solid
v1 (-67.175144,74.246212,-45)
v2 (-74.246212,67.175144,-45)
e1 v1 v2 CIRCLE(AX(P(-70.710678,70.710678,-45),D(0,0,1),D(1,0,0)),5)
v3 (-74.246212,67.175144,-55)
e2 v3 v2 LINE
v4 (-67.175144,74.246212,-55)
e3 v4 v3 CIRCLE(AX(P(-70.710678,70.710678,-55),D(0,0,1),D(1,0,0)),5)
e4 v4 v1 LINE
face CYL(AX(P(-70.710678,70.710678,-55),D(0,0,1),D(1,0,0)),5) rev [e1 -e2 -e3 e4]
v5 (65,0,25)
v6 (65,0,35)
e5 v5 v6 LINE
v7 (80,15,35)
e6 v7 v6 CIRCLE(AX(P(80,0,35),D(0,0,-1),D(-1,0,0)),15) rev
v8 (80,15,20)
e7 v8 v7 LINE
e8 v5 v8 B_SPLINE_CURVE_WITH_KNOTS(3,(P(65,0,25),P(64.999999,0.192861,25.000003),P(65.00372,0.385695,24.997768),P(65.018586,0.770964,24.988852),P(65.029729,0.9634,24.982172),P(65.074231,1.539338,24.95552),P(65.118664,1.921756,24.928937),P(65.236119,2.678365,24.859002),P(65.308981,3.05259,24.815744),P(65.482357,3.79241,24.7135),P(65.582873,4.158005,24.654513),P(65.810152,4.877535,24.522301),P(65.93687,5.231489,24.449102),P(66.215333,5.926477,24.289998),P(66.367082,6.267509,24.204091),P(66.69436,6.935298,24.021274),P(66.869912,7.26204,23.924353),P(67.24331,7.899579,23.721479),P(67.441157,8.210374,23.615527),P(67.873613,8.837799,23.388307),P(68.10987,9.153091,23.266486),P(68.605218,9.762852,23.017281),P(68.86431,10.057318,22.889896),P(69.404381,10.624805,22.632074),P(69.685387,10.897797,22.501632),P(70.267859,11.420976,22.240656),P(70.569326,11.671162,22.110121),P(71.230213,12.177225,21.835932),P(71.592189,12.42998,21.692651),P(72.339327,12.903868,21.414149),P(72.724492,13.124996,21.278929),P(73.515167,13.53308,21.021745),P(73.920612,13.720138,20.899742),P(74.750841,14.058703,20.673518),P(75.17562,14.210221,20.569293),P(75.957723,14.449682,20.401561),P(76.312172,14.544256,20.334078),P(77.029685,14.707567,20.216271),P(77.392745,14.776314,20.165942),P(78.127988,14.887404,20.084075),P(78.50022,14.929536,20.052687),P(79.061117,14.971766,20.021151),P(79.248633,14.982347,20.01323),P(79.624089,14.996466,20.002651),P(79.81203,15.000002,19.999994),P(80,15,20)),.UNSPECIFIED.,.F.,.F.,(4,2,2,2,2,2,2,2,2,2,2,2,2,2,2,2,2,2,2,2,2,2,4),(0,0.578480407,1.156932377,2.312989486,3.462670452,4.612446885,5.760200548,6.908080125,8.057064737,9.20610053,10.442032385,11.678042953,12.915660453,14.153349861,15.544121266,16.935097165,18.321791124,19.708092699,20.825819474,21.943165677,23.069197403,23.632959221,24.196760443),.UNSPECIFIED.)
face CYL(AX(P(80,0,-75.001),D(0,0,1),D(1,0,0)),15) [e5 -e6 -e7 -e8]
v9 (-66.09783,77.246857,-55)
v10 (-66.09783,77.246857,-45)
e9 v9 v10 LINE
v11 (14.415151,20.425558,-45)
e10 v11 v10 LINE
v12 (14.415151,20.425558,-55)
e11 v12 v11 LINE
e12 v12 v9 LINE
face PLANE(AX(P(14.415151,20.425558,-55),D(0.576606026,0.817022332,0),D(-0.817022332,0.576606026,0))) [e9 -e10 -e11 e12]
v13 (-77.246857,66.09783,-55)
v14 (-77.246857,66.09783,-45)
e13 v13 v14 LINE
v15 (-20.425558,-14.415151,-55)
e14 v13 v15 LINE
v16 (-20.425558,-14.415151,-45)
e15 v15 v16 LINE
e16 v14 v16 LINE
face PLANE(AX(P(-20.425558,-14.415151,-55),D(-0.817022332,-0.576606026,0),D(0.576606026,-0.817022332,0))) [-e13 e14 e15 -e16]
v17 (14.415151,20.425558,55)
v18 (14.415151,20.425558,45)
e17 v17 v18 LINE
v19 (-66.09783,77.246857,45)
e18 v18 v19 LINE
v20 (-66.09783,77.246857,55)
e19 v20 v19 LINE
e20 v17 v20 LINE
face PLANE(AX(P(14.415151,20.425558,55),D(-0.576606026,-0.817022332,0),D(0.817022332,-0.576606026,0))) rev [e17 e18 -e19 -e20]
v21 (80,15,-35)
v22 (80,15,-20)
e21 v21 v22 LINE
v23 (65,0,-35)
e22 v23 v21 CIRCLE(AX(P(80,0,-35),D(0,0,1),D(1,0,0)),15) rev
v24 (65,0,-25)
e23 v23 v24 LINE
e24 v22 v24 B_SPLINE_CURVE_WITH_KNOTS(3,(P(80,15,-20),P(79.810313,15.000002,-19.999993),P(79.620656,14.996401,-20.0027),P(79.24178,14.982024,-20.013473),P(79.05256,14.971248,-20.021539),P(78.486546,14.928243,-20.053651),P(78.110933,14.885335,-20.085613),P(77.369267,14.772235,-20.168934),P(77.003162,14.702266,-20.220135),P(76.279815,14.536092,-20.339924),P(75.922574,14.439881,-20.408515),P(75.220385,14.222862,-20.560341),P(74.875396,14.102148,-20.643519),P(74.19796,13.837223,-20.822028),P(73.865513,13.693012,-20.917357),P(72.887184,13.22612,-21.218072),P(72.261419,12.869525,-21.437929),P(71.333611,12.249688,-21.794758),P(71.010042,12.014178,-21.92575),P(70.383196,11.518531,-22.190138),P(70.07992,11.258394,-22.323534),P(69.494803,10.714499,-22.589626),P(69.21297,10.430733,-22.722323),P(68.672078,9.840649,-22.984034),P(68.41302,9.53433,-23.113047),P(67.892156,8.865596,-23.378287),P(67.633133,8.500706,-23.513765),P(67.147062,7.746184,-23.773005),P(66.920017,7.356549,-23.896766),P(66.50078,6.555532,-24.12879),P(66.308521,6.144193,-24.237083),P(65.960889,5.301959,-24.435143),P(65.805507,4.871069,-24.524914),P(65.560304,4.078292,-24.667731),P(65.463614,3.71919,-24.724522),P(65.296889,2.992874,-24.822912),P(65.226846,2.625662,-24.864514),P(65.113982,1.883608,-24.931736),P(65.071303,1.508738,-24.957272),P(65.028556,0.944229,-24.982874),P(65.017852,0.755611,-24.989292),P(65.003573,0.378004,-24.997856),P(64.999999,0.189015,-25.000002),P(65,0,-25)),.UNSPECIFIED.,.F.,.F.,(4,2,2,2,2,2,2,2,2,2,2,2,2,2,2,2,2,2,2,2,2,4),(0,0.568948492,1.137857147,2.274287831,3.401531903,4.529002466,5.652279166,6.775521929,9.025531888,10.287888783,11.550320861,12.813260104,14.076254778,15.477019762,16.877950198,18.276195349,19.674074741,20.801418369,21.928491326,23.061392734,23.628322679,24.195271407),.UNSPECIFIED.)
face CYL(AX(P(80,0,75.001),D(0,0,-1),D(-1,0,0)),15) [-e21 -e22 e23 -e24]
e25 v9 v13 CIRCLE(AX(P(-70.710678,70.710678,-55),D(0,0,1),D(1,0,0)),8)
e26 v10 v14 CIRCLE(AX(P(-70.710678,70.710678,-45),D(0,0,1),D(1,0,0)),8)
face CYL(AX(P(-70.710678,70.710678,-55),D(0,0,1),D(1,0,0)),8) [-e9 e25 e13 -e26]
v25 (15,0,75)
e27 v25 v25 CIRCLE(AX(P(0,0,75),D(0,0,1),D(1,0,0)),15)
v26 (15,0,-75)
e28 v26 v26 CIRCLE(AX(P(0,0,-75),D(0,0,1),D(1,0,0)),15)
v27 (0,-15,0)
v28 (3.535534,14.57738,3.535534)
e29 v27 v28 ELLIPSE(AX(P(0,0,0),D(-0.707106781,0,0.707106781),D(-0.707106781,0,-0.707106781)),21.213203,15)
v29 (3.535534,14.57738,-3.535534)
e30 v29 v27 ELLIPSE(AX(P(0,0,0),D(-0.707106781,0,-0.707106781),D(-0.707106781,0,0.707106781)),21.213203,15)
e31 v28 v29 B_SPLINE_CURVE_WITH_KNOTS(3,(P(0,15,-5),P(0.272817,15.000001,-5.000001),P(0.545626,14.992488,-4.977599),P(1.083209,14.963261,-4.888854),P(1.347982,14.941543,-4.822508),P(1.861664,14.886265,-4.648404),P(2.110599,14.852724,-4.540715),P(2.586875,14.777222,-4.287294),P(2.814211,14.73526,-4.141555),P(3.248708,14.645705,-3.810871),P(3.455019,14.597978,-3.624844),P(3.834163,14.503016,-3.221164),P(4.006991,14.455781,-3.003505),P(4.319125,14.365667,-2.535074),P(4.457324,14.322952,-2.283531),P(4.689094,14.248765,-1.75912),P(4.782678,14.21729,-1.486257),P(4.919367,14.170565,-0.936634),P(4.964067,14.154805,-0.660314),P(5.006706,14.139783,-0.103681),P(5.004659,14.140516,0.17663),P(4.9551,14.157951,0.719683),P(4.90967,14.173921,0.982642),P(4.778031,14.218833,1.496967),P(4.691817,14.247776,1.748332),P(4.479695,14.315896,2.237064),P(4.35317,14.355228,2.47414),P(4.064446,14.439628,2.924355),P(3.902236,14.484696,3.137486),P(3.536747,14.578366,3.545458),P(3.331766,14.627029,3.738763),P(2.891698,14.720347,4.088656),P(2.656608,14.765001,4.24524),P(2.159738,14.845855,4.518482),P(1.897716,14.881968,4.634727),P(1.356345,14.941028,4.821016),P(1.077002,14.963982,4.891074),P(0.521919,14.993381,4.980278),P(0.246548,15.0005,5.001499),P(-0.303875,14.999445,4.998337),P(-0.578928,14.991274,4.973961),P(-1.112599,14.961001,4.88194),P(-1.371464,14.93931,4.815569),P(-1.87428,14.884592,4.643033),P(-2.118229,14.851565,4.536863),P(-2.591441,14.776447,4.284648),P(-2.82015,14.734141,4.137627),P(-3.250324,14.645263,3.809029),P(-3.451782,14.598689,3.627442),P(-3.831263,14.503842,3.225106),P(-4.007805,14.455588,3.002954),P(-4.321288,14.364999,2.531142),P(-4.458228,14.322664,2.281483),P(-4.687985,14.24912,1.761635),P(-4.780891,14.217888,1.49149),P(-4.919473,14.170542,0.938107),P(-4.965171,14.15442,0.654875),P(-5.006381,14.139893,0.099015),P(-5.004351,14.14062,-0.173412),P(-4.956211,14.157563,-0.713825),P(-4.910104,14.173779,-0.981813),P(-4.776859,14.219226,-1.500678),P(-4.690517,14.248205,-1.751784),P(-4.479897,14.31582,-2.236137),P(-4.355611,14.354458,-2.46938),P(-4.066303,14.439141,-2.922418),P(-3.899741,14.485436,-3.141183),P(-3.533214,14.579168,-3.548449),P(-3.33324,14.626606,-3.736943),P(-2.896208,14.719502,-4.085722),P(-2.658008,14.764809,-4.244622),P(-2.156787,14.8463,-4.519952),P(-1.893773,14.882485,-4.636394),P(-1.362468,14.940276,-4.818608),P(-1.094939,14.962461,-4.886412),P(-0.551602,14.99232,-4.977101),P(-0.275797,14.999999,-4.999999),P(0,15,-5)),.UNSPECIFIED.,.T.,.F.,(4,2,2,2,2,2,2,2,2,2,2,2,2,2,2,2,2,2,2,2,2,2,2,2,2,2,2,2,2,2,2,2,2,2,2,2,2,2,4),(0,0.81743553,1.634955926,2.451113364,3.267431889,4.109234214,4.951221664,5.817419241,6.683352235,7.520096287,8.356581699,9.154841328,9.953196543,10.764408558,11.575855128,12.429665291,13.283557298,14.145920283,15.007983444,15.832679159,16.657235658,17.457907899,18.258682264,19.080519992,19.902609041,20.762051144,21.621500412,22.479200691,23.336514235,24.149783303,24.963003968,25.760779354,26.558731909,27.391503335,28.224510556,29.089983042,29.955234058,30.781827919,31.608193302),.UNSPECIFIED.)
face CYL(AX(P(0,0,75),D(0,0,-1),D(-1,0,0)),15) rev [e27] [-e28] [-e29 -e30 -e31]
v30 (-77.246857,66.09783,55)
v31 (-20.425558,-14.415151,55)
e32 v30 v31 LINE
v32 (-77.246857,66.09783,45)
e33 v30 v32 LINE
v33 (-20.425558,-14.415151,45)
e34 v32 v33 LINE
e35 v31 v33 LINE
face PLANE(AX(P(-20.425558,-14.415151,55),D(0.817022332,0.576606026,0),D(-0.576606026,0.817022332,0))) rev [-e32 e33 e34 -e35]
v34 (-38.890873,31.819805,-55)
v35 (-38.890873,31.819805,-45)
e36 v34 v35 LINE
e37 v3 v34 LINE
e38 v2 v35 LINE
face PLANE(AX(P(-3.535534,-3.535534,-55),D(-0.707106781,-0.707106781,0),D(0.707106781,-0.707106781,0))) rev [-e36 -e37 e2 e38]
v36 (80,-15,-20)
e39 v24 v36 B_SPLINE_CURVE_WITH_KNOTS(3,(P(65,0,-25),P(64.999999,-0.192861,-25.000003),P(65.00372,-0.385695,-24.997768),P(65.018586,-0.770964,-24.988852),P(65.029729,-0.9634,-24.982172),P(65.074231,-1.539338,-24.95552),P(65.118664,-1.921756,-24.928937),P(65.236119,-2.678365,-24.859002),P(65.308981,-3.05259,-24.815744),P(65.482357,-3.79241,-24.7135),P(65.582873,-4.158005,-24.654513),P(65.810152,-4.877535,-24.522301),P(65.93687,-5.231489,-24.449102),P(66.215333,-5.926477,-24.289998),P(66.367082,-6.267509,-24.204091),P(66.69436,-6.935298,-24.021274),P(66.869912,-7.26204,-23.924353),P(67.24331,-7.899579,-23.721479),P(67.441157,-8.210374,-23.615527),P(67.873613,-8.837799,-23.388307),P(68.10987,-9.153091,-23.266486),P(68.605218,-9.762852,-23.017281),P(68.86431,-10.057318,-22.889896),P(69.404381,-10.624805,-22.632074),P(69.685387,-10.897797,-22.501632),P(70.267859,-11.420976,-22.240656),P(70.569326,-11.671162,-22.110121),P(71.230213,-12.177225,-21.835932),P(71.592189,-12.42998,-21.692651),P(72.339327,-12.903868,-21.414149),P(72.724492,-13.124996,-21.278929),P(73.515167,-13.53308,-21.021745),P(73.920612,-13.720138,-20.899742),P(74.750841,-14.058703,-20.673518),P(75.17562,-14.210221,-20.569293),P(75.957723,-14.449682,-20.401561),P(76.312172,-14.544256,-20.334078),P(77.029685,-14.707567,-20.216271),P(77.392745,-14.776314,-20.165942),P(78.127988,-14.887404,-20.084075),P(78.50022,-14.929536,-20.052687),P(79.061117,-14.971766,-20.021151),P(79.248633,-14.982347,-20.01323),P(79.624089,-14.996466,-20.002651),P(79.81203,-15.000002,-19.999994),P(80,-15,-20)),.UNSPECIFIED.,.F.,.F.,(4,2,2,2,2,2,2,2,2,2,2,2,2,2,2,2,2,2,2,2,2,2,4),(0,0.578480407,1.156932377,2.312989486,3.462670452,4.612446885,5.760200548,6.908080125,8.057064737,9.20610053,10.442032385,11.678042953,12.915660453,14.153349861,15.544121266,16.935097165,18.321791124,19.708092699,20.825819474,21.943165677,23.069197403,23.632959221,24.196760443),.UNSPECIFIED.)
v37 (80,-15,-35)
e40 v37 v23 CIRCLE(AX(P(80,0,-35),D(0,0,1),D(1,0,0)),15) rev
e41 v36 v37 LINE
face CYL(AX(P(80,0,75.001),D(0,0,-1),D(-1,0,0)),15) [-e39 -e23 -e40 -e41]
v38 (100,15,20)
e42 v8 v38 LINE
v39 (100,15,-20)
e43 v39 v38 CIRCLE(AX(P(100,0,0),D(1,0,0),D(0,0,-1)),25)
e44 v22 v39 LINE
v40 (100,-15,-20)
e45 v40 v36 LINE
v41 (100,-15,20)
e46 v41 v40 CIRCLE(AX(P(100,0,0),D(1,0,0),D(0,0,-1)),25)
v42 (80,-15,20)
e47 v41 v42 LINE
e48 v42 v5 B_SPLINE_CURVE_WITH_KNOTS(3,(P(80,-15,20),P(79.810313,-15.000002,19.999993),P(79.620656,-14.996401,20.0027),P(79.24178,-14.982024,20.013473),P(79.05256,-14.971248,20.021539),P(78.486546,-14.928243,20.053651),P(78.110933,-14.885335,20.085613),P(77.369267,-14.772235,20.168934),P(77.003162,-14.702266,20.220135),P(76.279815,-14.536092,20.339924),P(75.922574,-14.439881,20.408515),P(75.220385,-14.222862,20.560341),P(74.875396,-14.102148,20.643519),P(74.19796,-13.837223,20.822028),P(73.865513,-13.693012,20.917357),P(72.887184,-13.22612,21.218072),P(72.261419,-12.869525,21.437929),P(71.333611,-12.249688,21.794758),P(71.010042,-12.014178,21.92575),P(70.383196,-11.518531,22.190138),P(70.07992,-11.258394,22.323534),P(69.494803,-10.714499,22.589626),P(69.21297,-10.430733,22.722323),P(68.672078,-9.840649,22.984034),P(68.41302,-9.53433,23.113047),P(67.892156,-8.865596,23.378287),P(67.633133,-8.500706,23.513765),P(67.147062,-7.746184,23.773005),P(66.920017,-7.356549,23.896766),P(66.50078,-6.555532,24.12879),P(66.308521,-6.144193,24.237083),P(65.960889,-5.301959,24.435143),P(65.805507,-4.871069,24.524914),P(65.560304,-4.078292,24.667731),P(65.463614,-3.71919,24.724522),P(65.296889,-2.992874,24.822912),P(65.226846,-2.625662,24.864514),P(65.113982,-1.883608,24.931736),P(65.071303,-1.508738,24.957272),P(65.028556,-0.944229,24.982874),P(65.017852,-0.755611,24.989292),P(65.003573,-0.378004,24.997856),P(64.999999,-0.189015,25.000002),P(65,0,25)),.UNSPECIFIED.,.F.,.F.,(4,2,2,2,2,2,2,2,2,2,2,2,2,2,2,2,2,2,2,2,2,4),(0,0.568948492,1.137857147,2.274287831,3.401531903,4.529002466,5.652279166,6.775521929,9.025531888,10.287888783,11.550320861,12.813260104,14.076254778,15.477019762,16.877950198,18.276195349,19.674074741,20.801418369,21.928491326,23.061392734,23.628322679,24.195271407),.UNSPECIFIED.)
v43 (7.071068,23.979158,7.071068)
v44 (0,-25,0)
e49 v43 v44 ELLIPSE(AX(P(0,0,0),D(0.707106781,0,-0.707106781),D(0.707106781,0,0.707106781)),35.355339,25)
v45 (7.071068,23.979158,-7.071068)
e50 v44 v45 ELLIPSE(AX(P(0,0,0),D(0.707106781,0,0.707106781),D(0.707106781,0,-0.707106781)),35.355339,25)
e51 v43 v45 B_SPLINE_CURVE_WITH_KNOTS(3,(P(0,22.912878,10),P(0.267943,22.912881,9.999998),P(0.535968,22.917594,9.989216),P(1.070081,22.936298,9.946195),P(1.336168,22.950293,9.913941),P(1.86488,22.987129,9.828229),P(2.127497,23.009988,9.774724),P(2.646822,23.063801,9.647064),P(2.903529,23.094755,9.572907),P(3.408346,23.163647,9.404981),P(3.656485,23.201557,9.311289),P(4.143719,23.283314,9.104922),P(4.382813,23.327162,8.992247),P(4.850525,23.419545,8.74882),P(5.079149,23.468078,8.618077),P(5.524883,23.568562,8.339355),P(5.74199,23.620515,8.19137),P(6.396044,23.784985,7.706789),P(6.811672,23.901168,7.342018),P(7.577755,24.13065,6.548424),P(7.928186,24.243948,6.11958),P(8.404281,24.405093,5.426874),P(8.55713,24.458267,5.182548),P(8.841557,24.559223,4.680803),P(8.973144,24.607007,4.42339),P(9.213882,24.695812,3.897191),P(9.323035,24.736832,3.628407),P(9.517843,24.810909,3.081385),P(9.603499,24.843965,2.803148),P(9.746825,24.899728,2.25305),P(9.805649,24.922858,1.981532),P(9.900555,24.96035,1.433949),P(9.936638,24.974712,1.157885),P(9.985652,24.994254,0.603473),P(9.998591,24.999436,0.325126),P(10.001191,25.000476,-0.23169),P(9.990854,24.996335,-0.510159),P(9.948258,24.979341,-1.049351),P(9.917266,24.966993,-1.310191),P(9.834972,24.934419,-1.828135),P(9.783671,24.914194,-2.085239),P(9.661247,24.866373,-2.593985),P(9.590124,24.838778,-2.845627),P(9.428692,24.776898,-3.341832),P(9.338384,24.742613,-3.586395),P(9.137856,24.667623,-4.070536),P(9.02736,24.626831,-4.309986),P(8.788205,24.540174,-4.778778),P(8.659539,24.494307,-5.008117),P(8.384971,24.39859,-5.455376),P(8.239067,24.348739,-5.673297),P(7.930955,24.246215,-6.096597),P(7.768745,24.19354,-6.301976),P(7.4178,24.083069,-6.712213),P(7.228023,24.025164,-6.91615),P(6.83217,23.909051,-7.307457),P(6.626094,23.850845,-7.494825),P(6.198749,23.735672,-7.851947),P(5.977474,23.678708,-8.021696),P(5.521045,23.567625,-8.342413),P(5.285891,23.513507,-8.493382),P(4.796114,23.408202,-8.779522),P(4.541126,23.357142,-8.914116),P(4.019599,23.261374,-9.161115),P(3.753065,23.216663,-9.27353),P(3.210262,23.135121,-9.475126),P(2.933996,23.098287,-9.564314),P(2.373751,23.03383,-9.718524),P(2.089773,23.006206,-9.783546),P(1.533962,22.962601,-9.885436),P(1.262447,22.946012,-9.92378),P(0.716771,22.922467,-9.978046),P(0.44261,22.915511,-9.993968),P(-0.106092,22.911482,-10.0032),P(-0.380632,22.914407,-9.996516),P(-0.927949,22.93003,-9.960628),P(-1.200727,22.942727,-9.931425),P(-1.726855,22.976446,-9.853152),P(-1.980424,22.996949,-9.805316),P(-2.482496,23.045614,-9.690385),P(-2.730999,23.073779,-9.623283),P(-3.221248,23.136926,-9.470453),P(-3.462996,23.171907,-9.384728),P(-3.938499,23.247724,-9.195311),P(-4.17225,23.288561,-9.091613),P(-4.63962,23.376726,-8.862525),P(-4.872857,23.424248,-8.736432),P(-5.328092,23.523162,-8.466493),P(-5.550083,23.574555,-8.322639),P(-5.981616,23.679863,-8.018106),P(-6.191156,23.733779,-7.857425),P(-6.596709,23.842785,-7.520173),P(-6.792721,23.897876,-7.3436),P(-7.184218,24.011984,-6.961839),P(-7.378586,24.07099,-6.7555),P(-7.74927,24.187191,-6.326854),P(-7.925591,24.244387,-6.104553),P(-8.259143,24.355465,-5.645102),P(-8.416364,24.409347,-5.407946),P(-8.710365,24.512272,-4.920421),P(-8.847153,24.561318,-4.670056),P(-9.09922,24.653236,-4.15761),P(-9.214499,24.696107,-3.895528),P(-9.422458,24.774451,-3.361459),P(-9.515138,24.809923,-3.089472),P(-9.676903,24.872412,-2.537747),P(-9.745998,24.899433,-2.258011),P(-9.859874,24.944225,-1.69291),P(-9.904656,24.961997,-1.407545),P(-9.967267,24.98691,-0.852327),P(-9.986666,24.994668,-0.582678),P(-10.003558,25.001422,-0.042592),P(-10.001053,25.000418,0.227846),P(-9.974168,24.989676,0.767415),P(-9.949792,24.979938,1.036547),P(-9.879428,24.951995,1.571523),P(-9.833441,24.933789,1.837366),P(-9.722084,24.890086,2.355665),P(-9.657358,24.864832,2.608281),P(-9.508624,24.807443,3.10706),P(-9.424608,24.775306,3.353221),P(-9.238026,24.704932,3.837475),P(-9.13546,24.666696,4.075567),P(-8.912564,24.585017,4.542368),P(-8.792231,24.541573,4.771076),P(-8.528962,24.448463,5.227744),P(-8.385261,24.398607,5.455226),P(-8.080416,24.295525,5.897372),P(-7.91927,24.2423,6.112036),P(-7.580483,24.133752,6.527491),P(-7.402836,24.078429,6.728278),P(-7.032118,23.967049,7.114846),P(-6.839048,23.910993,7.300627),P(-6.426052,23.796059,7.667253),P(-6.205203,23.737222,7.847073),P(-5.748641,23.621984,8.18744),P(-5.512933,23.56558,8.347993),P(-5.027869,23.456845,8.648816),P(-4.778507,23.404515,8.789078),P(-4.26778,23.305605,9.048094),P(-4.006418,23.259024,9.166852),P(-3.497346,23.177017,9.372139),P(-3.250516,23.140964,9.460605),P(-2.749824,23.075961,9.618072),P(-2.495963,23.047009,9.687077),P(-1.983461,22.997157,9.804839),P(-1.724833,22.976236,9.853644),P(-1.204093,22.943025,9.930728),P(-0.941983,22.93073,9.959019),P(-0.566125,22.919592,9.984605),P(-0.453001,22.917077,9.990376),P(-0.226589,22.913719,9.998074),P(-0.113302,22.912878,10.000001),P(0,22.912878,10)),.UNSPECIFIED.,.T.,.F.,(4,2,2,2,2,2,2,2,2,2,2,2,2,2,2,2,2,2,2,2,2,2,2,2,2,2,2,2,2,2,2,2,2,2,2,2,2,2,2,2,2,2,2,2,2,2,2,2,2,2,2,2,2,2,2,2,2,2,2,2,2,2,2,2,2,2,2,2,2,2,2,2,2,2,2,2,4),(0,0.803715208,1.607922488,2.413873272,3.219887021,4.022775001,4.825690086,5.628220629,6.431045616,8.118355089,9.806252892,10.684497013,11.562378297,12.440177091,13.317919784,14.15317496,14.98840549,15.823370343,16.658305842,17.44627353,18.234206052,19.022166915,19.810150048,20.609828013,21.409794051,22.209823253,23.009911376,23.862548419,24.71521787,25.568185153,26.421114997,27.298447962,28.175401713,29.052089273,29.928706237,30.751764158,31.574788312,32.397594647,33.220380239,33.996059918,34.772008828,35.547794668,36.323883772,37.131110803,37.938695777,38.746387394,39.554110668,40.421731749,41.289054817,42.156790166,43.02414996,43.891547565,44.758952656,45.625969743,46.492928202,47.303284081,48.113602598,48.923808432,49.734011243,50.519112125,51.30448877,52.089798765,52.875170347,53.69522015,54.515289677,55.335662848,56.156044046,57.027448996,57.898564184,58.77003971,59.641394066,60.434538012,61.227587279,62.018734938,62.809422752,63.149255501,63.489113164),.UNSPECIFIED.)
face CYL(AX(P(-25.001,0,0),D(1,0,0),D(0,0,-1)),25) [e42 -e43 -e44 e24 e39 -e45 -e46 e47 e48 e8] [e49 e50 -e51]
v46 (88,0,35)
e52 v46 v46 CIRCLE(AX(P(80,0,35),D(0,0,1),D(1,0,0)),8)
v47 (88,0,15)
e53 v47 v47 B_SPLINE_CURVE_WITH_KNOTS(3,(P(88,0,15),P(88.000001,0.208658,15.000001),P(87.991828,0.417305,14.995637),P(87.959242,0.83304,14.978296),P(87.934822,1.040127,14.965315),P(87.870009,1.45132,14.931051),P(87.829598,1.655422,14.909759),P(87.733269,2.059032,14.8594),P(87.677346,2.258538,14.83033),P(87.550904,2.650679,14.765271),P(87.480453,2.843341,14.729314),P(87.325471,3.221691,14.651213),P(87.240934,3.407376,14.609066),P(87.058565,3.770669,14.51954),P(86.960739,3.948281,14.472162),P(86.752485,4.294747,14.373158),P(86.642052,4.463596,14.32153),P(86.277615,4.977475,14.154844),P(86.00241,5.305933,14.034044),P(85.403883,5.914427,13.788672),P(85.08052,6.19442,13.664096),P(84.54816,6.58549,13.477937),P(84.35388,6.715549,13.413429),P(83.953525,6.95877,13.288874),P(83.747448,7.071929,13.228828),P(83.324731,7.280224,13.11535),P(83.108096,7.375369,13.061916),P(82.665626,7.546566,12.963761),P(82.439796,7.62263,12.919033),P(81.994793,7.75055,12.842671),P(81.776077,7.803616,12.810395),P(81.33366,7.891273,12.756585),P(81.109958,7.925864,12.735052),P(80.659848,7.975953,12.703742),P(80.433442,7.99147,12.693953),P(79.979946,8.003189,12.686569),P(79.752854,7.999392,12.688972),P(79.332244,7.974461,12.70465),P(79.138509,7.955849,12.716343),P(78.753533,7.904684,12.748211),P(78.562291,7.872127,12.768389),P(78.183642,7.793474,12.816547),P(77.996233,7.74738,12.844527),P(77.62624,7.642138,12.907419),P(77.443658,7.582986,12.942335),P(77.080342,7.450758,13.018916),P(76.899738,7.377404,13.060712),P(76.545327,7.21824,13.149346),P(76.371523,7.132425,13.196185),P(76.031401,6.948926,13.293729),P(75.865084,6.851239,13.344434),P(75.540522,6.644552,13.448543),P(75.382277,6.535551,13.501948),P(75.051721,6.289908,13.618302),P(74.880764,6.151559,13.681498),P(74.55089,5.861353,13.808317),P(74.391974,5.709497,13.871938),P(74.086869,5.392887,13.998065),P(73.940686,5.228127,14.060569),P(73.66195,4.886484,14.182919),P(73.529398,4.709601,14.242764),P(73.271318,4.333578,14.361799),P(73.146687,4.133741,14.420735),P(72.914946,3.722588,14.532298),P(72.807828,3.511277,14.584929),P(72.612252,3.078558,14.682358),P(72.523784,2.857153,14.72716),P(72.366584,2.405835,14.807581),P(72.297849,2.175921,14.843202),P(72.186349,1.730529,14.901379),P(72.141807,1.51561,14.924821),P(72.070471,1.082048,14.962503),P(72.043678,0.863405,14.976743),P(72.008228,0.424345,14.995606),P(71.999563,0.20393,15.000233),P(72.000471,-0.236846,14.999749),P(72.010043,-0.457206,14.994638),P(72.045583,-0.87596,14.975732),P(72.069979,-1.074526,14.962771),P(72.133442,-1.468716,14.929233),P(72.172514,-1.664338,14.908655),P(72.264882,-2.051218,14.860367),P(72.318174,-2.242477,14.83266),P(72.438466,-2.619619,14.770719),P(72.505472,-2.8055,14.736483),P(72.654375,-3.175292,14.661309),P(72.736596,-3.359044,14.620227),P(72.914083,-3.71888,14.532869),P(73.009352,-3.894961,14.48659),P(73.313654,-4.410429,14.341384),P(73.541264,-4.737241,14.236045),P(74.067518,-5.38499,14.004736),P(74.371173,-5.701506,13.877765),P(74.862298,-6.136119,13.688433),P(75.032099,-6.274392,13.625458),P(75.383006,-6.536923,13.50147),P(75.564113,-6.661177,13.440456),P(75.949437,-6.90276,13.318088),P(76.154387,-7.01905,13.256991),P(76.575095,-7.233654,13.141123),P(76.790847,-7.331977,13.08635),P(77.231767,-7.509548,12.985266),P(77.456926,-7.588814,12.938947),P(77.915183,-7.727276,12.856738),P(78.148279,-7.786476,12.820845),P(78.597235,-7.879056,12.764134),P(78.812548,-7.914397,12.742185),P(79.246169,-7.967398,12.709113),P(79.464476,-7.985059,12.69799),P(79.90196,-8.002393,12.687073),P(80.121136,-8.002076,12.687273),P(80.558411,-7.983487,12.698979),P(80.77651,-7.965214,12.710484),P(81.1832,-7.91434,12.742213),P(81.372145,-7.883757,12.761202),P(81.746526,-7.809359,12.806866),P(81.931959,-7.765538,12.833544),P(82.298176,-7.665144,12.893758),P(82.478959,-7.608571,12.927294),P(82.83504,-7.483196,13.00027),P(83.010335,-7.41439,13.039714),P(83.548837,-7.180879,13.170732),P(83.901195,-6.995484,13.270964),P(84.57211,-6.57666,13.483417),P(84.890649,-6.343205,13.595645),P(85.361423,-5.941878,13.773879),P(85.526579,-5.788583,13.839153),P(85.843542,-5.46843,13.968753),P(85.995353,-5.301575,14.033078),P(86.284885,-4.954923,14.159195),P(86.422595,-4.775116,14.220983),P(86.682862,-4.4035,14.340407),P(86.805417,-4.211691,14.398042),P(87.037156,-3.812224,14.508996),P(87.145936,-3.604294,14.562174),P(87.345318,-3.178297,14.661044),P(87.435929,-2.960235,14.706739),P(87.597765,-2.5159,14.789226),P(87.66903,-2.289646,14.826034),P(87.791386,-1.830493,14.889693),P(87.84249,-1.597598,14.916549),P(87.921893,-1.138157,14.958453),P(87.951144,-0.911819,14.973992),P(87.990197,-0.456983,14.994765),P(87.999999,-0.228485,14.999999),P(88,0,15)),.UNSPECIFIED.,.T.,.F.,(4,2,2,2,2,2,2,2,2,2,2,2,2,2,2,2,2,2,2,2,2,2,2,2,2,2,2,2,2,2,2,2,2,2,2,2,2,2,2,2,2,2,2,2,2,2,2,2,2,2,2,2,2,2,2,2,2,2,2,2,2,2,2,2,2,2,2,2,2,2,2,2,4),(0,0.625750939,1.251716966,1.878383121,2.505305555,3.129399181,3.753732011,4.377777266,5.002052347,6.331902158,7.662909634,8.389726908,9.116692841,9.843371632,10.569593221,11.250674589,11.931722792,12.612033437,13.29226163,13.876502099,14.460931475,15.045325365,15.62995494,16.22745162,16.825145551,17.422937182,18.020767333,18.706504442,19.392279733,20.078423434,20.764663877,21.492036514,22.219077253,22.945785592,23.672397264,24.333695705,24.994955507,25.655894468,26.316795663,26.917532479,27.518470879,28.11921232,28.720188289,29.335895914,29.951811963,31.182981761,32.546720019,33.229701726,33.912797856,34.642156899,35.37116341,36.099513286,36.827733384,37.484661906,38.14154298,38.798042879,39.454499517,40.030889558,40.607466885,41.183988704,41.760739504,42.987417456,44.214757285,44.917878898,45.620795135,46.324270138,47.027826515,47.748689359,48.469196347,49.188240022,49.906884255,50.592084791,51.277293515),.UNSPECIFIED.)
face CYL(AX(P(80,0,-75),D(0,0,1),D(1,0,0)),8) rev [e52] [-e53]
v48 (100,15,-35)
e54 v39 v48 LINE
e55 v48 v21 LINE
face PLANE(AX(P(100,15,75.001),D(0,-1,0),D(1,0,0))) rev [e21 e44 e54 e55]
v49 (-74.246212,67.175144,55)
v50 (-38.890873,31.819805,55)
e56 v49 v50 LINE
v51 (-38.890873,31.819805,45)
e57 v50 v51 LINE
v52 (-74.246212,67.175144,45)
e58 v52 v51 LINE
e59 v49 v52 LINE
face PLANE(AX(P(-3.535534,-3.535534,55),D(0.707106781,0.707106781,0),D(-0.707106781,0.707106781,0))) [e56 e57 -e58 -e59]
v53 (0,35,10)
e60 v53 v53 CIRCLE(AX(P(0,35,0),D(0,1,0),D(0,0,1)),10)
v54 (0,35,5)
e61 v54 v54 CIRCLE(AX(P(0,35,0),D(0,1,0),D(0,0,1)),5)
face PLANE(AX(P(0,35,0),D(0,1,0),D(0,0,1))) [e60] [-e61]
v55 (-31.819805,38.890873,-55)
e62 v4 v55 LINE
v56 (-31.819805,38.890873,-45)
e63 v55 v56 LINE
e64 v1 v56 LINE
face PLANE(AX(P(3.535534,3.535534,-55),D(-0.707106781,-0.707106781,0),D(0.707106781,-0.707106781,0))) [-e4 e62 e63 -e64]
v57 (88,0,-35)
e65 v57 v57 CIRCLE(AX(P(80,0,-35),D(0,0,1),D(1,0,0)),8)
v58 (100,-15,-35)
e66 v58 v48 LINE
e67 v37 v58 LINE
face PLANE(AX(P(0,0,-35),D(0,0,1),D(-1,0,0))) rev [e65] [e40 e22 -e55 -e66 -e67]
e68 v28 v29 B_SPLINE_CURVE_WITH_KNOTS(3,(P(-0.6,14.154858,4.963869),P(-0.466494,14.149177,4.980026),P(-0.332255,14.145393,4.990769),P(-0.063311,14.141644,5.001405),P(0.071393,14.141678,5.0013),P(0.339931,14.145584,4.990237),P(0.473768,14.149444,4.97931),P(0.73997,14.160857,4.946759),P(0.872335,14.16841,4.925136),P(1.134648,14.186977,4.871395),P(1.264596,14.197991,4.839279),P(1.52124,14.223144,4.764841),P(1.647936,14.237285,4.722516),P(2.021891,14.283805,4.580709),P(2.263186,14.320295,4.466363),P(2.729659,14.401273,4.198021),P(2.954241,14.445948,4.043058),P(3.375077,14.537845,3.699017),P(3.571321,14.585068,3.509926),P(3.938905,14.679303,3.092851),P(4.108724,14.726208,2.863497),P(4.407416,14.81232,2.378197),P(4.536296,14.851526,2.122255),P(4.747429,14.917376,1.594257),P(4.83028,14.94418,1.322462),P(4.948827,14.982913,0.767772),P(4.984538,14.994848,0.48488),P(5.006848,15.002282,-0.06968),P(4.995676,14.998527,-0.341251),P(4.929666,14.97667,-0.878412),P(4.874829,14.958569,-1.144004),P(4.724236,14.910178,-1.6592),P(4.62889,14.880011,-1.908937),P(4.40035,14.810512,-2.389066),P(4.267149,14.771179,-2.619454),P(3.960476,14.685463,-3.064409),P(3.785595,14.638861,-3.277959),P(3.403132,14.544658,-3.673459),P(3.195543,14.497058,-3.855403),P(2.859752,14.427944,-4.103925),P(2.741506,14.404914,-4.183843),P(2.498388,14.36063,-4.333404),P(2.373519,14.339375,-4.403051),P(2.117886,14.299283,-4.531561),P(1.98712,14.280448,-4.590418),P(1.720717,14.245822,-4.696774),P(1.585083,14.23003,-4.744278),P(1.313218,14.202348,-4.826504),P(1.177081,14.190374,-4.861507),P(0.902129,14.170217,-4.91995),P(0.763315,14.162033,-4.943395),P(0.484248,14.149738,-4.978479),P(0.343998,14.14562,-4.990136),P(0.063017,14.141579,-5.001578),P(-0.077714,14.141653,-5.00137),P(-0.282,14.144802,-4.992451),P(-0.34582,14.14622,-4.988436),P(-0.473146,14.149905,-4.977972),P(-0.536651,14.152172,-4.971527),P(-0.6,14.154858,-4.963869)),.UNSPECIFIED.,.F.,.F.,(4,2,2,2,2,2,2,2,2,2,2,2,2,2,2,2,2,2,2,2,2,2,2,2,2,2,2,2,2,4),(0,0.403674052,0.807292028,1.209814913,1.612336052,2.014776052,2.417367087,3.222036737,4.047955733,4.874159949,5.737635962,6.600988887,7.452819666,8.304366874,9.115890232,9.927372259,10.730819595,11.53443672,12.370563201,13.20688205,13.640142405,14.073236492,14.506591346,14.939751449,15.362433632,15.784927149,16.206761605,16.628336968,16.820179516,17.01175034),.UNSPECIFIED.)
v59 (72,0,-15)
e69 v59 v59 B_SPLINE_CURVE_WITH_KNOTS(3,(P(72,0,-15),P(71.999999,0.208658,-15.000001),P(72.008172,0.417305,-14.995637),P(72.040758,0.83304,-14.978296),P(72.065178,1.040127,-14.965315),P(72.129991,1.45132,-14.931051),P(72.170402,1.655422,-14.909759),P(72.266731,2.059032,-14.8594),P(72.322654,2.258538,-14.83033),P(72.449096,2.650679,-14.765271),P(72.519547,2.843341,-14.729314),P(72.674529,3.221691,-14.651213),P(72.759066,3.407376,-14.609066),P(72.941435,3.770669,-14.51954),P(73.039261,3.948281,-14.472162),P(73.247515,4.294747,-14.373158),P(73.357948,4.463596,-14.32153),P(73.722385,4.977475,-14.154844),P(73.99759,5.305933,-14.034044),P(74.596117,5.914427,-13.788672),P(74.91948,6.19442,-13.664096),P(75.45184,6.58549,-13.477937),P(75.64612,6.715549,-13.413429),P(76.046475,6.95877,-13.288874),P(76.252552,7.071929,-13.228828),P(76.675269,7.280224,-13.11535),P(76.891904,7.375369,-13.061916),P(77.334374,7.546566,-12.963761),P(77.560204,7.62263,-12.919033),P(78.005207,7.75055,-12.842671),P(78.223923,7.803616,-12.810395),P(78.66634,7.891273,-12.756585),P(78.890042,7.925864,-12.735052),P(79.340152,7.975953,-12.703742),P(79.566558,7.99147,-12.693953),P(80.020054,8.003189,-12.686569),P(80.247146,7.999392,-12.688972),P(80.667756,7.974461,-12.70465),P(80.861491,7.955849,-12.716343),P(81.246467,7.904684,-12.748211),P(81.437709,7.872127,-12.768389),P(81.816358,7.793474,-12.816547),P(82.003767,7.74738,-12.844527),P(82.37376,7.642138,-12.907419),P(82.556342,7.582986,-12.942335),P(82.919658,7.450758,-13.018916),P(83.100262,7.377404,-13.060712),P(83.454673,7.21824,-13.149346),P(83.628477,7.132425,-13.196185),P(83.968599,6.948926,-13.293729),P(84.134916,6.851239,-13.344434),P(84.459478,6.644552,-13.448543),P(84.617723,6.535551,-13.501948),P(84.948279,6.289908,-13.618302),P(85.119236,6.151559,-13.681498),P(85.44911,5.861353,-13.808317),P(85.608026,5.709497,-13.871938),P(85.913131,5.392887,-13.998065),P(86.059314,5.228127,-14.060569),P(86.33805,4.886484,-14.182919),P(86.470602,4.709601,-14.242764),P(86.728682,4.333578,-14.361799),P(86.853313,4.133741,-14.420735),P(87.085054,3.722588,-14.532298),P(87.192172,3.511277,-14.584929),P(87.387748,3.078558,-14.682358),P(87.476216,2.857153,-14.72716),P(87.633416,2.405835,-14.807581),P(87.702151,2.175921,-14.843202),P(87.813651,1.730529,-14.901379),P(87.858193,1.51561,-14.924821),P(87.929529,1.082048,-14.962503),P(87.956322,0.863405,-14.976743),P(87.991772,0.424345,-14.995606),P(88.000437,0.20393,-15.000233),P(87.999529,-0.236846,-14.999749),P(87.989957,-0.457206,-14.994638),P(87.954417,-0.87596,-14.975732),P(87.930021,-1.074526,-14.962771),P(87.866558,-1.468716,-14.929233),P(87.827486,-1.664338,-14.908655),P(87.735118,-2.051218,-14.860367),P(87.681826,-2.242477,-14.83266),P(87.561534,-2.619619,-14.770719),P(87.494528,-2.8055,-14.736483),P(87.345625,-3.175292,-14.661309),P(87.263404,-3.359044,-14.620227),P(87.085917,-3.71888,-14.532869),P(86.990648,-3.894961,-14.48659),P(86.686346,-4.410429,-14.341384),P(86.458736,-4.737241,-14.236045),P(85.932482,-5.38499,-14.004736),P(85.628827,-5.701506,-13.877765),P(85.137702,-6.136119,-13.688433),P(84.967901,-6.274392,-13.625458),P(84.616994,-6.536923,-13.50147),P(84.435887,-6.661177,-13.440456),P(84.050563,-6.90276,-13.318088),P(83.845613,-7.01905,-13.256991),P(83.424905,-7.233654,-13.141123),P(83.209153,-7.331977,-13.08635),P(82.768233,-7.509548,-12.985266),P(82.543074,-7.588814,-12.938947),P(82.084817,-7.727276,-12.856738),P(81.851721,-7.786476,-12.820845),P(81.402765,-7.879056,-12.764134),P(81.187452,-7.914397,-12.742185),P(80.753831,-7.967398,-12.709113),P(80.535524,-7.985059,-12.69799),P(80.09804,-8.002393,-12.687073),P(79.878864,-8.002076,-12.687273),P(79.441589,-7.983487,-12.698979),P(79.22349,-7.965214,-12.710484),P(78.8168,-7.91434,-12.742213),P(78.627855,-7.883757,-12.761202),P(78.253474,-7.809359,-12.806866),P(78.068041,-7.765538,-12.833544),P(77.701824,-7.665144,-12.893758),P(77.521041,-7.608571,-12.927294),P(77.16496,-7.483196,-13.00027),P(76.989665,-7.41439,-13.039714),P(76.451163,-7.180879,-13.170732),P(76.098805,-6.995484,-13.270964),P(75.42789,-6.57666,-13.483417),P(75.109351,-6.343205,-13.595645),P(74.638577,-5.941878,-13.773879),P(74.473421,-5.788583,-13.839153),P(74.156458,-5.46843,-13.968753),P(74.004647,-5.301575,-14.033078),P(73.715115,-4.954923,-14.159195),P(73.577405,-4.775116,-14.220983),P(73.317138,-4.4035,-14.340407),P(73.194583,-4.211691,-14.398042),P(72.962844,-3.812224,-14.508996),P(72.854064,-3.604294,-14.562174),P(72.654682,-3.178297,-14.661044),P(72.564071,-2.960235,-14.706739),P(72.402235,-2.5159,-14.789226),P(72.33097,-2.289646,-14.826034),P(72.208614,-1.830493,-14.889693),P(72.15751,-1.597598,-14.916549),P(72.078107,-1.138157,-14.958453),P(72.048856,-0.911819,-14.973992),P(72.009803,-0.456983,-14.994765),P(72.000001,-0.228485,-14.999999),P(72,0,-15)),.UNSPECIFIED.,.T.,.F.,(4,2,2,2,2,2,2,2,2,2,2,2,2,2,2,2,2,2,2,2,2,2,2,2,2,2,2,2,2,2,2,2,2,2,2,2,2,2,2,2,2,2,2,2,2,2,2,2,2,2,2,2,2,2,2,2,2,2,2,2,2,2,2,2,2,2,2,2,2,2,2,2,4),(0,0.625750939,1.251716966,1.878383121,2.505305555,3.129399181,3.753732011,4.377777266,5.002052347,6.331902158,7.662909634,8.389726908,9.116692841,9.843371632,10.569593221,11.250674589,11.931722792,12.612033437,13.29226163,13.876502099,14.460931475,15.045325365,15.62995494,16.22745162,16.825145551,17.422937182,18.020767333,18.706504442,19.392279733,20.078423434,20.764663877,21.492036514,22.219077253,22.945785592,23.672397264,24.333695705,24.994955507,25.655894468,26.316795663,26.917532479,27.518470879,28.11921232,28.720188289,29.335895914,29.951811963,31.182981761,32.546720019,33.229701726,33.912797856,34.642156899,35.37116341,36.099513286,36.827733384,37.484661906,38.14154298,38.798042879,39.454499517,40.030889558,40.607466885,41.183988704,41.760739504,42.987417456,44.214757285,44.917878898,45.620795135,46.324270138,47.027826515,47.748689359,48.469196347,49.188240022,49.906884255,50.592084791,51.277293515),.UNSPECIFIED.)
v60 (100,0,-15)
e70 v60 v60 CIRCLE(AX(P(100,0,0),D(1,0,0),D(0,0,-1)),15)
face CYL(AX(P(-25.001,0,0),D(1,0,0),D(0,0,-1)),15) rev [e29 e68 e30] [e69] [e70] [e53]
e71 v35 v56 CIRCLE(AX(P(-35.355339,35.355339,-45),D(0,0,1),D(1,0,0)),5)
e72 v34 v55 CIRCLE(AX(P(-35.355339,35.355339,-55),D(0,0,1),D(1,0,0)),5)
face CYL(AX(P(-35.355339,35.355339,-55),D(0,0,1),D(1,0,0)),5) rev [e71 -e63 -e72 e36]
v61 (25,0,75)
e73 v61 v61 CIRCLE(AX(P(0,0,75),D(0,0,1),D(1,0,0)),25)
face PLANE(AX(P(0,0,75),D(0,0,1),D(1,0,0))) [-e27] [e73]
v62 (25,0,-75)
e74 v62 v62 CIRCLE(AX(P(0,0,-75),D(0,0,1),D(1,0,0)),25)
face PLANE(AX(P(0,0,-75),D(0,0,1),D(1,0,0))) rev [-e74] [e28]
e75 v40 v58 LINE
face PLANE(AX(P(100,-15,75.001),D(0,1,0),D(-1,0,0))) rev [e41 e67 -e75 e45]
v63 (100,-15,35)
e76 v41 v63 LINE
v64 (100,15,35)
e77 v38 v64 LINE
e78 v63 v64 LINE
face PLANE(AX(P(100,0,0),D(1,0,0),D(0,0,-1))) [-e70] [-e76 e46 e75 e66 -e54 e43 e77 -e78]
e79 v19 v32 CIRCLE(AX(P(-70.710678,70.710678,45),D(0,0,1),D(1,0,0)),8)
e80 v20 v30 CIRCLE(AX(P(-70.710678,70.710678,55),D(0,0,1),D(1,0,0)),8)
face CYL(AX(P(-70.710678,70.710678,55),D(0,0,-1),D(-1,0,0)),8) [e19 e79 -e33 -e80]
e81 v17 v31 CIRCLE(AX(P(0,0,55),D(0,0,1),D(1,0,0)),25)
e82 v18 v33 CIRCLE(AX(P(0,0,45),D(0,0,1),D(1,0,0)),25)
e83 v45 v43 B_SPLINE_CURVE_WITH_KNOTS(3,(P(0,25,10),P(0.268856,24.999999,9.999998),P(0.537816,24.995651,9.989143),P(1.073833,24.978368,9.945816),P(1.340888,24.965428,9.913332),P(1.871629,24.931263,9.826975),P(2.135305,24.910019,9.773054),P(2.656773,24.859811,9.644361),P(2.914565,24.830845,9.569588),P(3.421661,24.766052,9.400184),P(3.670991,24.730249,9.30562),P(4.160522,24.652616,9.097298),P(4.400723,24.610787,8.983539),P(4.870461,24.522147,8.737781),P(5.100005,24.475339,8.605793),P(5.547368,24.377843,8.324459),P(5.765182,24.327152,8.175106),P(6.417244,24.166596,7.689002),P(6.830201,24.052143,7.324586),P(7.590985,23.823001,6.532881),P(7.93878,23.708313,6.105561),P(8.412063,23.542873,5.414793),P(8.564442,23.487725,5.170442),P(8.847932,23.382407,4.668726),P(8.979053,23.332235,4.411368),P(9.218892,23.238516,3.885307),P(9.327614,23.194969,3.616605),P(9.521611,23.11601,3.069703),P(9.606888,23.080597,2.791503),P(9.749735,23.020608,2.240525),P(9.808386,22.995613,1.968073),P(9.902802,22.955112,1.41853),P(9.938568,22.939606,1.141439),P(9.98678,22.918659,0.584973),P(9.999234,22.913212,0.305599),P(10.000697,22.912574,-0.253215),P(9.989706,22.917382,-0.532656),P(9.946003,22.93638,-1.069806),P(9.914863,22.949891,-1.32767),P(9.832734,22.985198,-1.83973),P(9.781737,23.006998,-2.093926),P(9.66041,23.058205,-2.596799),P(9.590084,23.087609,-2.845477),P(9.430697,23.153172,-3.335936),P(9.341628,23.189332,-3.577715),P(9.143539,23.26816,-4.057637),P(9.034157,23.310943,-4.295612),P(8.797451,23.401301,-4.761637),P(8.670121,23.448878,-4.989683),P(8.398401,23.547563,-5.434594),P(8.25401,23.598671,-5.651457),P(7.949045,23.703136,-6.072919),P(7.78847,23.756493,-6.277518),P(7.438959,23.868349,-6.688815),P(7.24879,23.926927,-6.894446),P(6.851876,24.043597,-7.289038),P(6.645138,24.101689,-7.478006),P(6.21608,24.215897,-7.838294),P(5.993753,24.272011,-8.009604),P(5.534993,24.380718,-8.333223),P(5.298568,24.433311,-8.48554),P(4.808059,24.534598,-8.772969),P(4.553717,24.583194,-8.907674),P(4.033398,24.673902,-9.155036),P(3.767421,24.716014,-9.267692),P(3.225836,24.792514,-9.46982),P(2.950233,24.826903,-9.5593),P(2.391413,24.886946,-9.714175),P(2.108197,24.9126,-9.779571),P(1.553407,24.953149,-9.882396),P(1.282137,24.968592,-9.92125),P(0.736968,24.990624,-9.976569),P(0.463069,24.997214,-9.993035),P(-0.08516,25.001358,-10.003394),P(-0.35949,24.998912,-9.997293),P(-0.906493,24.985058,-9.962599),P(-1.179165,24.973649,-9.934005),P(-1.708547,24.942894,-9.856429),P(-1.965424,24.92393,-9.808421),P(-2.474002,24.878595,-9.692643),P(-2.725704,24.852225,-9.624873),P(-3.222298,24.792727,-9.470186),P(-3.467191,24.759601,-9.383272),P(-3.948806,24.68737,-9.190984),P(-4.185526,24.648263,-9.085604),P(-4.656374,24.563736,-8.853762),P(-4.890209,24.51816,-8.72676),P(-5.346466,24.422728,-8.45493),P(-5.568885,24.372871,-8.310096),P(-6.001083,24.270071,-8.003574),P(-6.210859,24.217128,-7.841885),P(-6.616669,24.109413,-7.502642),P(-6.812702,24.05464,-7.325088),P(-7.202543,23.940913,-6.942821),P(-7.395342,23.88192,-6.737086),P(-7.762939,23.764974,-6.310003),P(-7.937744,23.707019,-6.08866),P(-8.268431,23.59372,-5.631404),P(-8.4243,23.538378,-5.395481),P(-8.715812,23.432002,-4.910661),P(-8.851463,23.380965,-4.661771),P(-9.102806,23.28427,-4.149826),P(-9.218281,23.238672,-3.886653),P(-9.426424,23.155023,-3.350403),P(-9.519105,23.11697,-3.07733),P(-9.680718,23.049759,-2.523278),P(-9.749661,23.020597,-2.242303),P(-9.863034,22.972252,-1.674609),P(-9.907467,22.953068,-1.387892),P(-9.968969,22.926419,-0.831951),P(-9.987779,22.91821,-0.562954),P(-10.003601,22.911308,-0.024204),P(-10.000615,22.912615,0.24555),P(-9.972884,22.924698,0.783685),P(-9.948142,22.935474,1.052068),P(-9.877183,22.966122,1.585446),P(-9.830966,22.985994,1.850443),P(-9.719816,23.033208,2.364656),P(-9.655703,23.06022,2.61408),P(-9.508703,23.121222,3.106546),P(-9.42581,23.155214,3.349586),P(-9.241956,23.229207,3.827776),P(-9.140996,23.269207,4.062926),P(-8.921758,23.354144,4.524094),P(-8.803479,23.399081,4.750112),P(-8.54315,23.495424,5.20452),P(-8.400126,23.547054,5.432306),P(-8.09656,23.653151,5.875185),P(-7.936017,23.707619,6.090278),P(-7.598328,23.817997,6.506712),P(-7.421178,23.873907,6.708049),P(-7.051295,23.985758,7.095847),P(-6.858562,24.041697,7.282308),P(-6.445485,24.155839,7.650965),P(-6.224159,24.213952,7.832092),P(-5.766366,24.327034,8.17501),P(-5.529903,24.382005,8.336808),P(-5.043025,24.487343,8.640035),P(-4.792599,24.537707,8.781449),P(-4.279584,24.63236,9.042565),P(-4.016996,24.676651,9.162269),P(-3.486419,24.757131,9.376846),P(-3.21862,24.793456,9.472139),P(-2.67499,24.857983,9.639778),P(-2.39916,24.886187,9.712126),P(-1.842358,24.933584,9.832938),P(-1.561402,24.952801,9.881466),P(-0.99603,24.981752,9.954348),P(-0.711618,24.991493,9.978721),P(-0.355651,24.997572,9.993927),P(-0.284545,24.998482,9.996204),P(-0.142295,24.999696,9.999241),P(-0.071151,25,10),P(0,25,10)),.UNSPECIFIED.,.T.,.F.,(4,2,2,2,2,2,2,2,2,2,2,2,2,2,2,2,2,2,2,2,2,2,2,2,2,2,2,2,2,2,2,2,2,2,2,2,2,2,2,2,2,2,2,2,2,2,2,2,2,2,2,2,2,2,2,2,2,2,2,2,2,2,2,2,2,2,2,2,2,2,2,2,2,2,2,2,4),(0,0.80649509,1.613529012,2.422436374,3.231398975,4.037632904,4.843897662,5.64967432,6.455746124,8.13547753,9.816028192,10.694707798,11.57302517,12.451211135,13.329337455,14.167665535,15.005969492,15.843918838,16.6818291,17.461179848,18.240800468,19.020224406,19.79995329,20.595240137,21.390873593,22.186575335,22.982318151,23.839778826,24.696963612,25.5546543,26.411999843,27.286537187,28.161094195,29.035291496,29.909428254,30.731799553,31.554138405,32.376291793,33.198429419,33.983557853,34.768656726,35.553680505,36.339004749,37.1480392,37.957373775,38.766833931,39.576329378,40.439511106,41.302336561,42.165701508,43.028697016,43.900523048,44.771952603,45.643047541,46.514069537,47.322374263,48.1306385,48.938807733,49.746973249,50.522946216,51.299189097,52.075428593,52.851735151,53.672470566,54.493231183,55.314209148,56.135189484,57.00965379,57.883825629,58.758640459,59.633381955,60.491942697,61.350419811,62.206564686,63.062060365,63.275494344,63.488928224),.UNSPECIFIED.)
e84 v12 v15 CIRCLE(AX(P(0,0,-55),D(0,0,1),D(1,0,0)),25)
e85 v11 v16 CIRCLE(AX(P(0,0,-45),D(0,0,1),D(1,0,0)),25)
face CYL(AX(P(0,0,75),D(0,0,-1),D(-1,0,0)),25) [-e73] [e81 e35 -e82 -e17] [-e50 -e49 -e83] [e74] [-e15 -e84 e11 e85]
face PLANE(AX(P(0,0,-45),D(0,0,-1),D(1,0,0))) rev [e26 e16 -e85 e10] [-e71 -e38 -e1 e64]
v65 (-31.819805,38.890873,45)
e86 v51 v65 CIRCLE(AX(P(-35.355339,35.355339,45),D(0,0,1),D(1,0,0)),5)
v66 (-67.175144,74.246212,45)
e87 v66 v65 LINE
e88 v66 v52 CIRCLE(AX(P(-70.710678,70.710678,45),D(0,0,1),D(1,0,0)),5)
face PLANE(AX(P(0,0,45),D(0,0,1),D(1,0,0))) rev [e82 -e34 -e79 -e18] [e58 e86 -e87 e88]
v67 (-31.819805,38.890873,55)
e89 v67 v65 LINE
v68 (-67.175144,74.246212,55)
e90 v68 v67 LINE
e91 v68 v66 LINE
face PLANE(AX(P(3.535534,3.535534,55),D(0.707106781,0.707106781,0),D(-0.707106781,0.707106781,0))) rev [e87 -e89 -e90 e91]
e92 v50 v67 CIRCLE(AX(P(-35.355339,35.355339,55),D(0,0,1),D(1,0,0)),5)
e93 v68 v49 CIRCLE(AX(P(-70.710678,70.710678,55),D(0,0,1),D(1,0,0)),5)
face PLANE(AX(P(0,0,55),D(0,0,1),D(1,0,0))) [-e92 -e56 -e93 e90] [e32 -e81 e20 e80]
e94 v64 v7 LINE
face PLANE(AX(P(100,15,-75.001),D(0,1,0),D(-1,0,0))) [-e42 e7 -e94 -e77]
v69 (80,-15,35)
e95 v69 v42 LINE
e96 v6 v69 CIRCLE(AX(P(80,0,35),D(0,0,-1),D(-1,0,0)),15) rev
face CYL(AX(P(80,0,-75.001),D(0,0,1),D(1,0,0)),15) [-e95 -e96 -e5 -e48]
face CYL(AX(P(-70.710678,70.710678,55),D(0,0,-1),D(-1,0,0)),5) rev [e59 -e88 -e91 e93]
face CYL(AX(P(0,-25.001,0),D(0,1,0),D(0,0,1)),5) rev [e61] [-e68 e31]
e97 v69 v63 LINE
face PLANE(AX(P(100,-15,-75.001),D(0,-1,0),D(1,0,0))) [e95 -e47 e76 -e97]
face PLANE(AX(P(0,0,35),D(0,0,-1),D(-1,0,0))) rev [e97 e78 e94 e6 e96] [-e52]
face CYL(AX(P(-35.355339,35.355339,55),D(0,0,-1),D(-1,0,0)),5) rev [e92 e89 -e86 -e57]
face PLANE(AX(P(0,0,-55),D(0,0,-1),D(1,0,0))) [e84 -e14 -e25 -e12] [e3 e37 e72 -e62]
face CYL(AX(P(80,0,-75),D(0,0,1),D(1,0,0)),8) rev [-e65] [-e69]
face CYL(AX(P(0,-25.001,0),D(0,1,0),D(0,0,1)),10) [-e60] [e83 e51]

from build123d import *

# Parameters (mm, degrees)
CROQUIS1_R                   = 25
CROQUIS1_R_2                 = 15
SALIENTE_EXTRUIR1_DEPTH      = 75
SALIENTE_EXTRUIR3_REACH      = 184.916
SALIENTE_EXTRUIR3_END_RADIUS = 25
SALIENTE_EXTRUIR3_START      = 100
CROQUIS2_R                   = 25
CROQUIS2_R_2                 = 15
CORTAR_EXTRUIR1_REACH        = 129.475
CROQUIS2_2_R                 = 15
SALIENTE_EXTRUIR4_REACH      = 164.475
SALIENTE_EXTRUIR4_END_RADIUS = 25
SALIENTE_EXTRUIR4_START      = 35
CROQUIS3_W                   = 35
CROQUIS3_H                   = 30
REDONDEO1_R                  = 15
CROQUIS4_R                   = 8
CORTAR_EXTRUIR2_DEPTH        = 151.7481344
SALIENTE_EXTRUIR5_START      = 55
SALIENTE_EXTRUIR5_DEPTH      = 10
SALIENTE_EXTRUIR6_START      = 22.912881
CROQUIS6_R                   = 10
CROQUIS6_R_2                 = 5
SALIENTE_EXTRUIR6_DEPTH      = 12.087119
CORTAR_EXTRUIR3_REACH        = 149.717
CROQUIS6_2_R                 = 5
REDONDEO1_OF_SIMETR_A1_R     = 15


with BuildPart() as part:
    # Croquis1 → Saliente-Extruir1 (new, symmetric)
    with BuildSketch(Plane.XY):
        Circle(CROQUIS1_R)
        Circle(CROQUIS1_R_2, mode=Mode.SUBTRACT)
    extrude(amount=SALIENTE_EXTRUIR1_DEPTH, both=True)

    # Saliente-Extruir3: up to this cylinder (the profile starts outside it)
    saliente_extruir3_end = Plane(origin=(0, 0, 24.292893), z_dir=(0, 0, -1)) * Cylinder(SALIENTE_EXTRUIR3_END_RADIUS, 420.832, mode=Mode.PRIVATE)
    # Croquis2 → Saliente-Extruir3 (add, up to the surface)
    with BuildSketch(Plane(origin=(0, 0, 0), x_dir=(0, 0, -1), z_dir=(1, 0, 0)).offset(SALIENTE_EXTRUIR3_START), mode=Mode.PRIVATE) as saliente_extruir3_sk1:
        Circle(CROQUIS2_R)
        Circle(CROQUIS2_R_2, mode=Mode.SUBTRACT)
    saliente_extruir3_tool1 = extrude(saliente_extruir3_sk1.sketch, amount=-SALIENTE_EXTRUIR3_REACH, mode=Mode.PRIVATE) - saliente_extruir3_end
    add(saliente_extruir3_tool1.solids().sort_by_distance((100, 0, 24.292893))[0])

    # Croquis2<2> → Cortar-Extruir1 (cut, up to next)
    with BuildSketch(Plane(origin=(0, 0, 0), x_dir=(0, 0, -1), z_dir=(1, 0, 0)), mode=Mode.PRIVATE) as cortar_extruir1_sk1:
        Circle(CROQUIS2_2_R)
    cortar_extruir1_tool1 = extrude(cortar_extruir1_sk1.sketch, amount=CORTAR_EXTRUIR1_REACH, mode=Mode.PRIVATE) & part.part
    add(cortar_extruir1_tool1.solids().sort_by_distance((0, 0, 0))[0], mode=Mode.SUBTRACT)

    # Saliente-Extruir4: up to this cylinder (the profile starts outside it)
    saliente_extruir4_end = Plane(origin=(82.5, 0, 0), z_dir=(1, 0, 0)) * Cylinder(SALIENTE_EXTRUIR4_END_RADIUS, 379.95, mode=Mode.PRIVATE)
    # Croquis3 → Saliente-Extruir4 (add, up to the surface)
    with BuildSketch(Plane.XY.offset(SALIENTE_EXTRUIR4_START), mode=Mode.PRIVATE) as saliente_extruir4_sk1:
        with Locations((82.5, 0)):
            Rectangle(CROQUIS3_W, CROQUIS3_H)
    saliente_extruir4_tool1 = extrude(saliente_extruir4_sk1.sketch, amount=-SALIENTE_EXTRUIR4_REACH, mode=Mode.PRIVATE) - saliente_extruir4_end
    saliente_extruir4 = saliente_extruir4_tool1.solids().sort_by_distance((82.5, 0, 35))[0]
    add(saliente_extruir4)

    # Redondeo1
    # the kernel refuses this fillet: 15 mm, written as the material it takes off along each edge
    with BuildSketch(Plane(origin=(65, 15, 72.5), x_dir=(1, 0, 0), z_dir=(0, 0, -1))) as redondeo1_piece_1_section:
        with BuildLine():
            CenterArc((REDONDEO1_R, REDONDEO1_R), REDONDEO1_R, 180, 90)
            Line((0, REDONDEO1_R), (0, 0))
            Line((0, 0), (REDONDEO1_R, 0))
        make_face()
    redondeo1_piece_1 = extrude(amount=90, mode=Mode.PRIVATE)
    redondeo1_piece_1 = redondeo1_piece_1 - Plane(origin=(68.454600716, 0, 0), x_dir=(0, 0, -1), z_dir=(1, 0, 0)) * Cylinder(25, 240, mode=Mode.PRIVATE)
    add(redondeo1_piece_1, mode=Mode.SUBTRACT)
    with BuildSketch(Plane(origin=(65, -15, 72.5), x_dir=(0, 1, 0), z_dir=(0, 0, -1))) as redondeo1_piece_2_section:
        with BuildLine():
            CenterArc((REDONDEO1_R, REDONDEO1_R), REDONDEO1_R, 180, 90)
            Line((0, REDONDEO1_R), (0, 0))
            Line((0, 0), (REDONDEO1_R, 0))
        make_face()
    redondeo1_piece_2 = extrude(amount=90, mode=Mode.PRIVATE)
    redondeo1_piece_2 = redondeo1_piece_2 - Plane(origin=(68.454600972, 0, 0), x_dir=(0, 0, -1), z_dir=(1, 0, 0)) * Cylinder(25, 240, mode=Mode.PRIVATE)
    add(redondeo1_piece_2, mode=Mode.SUBTRACT)

    # Croquis4 → Cortar-Extruir2 (cut, through all)
    with BuildSketch(Plane.XY.offset(35)):
        with Locations((80, 0)):
            Circle(CROQUIS4_R)
    cortar_extruir2 = extrude(amount=-CORTAR_EXTRUIR2_DEPTH, mode=Mode.SUBTRACT)

    # Croquis5 → Saliente-Extruir5 (add)
    with BuildSketch(Plane.XY.offset(SALIENTE_EXTRUIR5_START)):
        with BuildLine():
            ThreePointArc((-20.425558294, -14.415150654), (-17.67766953, 17.67766953), (14.415150654, 20.425558294))
            Line((14.415150654, 20.425558294), (-66.097829909, 77.246856773))
            ThreePointArc((-66.097829909, 77.246856773), (-76.367532368, 76.367532368), (-77.246856773, 66.097829909))
            Line((-77.246856773, 66.097829909), (-20.425558294, -14.415150654))
        make_face()
        with BuildLine():
            ThreePointArc((-74.246212025, 67.175144213), (-74.246212025, 74.246212025), (-67.175144213, 74.246212025))
            Line((-67.175144213, 74.246212025), (-31.819805153, 38.890872965))
            ThreePointArc((-31.819805153, 38.890872965), (-31.819805153, 31.819805153), (-38.890872965, 31.819805153))
            Line((-38.890872965, 31.819805153), (-74.246212025, 67.175144213))
        make_face(mode=Mode.SUBTRACT)
    saliente_extruir5 = extrude(amount=-SALIENTE_EXTRUIR5_DEPTH)

    # Croquis6 → Saliente-Extruir6 (add)
    with BuildSketch(Plane(origin=(0, 0, 0), x_dir=(1, 0, 0), z_dir=(0, 1, 0)).offset(SALIENTE_EXTRUIR6_START)):
        with Locations(Location((0, 0, 0), (0, 0, 270))):
            Circle(CROQUIS6_R)
        with Locations(Location((0, 0, 0), (0, 0, 270))):
            Circle(CROQUIS6_R_2, mode=Mode.SUBTRACT)
    extrude(amount=SALIENTE_EXTRUIR6_DEPTH)

    # Croquis6<2> → Cortar-Extruir3 (cut, up to next)
    with BuildSketch(Plane(origin=(0, 0, 0), x_dir=(1, 0, 0), z_dir=(0, 1, 0)), mode=Mode.PRIVATE) as cortar_extruir3_sk1:
        with Locations(Location((0, 0, 0), (0, 0, 270))):
            Circle(CROQUIS6_2_R)
    cortar_extruir3_tool1 = extrude(cortar_extruir3_sk1.sketch, amount=CORTAR_EXTRUIR3_REACH, mode=Mode.PRIVATE) & part.part
    add(cortar_extruir3_tool1.solids().sort_by_distance((0, 0, 0))[0], mode=Mode.SUBTRACT)

    # Simetría1: Saliente-Extruir4, Cortar-Extruir2, Saliente-Extruir5 across plane
    add(saliente_extruir4.mirror(Plane.XY))
    add(cortar_extruir2.mirror(Plane.XY), mode=Mode.SUBTRACT)
    add(saliente_extruir5.mirror(Plane.XY))

    # Redondeo1 of Simetría1
    # the kernel refuses this fillet: 15 mm, written as the material it takes off along each edge
    with BuildSketch(Plane(origin=(65, 15, -72.5), x_dir=(0, -1, 0), z_dir=(0, 0, 1))) as redondeo1_of_simetr_a1_piece_1_section:
        with BuildLine():
            CenterArc((REDONDEO1_OF_SIMETR_A1_R, REDONDEO1_OF_SIMETR_A1_R), REDONDEO1_OF_SIMETR_A1_R, 180, 90)
            Line((0, REDONDEO1_OF_SIMETR_A1_R), (0, 0))
            Line((0, 0), (REDONDEO1_OF_SIMETR_A1_R, 0))
        make_face()
    redondeo1_of_simetr_a1_piece_1 = extrude(amount=90, mode=Mode.PRIVATE)
    redondeo1_of_simetr_a1_piece_1 = redondeo1_of_simetr_a1_piece_1 - Plane(origin=(68.454600972, 0, 0), x_dir=(0, 0, -1), z_dir=(1, 0, 0)) * Cylinder(25, 240, mode=Mode.PRIVATE)
    add(redondeo1_of_simetr_a1_piece_1, mode=Mode.SUBTRACT)
    with BuildSketch(Plane(origin=(65, -15, -72.5), x_dir=(0, 1, 0), z_dir=(0, 0, 1))) as redondeo1_of_simetr_a1_piece_2_section:
        with BuildLine():
            CenterArc((REDONDEO1_OF_SIMETR_A1_R, -REDONDEO1_OF_SIMETR_A1_R), REDONDEO1_OF_SIMETR_A1_R, 90, 90)
            Line((0, -REDONDEO1_OF_SIMETR_A1_R), (0, 0))
            Line((0, 0), (REDONDEO1_OF_SIMETR_A1_R, 0))
        make_face()
    redondeo1_of_simetr_a1_piece_2 = extrude(amount=90, mode=Mode.PRIVATE)
    redondeo1_of_simetr_a1_piece_2 = redondeo1_of_simetr_a1_piece_2 - Plane(origin=(68.454600579, 0, 0), x_dir=(0, 0, -1), z_dir=(1, 0, 0)) * Cylinder(25, 240, mode=Mode.PRIVATE)
    add(redondeo1_of_simetr_a1_piece_2, mode=Mode.SUBTRACT)


solid = part.part
